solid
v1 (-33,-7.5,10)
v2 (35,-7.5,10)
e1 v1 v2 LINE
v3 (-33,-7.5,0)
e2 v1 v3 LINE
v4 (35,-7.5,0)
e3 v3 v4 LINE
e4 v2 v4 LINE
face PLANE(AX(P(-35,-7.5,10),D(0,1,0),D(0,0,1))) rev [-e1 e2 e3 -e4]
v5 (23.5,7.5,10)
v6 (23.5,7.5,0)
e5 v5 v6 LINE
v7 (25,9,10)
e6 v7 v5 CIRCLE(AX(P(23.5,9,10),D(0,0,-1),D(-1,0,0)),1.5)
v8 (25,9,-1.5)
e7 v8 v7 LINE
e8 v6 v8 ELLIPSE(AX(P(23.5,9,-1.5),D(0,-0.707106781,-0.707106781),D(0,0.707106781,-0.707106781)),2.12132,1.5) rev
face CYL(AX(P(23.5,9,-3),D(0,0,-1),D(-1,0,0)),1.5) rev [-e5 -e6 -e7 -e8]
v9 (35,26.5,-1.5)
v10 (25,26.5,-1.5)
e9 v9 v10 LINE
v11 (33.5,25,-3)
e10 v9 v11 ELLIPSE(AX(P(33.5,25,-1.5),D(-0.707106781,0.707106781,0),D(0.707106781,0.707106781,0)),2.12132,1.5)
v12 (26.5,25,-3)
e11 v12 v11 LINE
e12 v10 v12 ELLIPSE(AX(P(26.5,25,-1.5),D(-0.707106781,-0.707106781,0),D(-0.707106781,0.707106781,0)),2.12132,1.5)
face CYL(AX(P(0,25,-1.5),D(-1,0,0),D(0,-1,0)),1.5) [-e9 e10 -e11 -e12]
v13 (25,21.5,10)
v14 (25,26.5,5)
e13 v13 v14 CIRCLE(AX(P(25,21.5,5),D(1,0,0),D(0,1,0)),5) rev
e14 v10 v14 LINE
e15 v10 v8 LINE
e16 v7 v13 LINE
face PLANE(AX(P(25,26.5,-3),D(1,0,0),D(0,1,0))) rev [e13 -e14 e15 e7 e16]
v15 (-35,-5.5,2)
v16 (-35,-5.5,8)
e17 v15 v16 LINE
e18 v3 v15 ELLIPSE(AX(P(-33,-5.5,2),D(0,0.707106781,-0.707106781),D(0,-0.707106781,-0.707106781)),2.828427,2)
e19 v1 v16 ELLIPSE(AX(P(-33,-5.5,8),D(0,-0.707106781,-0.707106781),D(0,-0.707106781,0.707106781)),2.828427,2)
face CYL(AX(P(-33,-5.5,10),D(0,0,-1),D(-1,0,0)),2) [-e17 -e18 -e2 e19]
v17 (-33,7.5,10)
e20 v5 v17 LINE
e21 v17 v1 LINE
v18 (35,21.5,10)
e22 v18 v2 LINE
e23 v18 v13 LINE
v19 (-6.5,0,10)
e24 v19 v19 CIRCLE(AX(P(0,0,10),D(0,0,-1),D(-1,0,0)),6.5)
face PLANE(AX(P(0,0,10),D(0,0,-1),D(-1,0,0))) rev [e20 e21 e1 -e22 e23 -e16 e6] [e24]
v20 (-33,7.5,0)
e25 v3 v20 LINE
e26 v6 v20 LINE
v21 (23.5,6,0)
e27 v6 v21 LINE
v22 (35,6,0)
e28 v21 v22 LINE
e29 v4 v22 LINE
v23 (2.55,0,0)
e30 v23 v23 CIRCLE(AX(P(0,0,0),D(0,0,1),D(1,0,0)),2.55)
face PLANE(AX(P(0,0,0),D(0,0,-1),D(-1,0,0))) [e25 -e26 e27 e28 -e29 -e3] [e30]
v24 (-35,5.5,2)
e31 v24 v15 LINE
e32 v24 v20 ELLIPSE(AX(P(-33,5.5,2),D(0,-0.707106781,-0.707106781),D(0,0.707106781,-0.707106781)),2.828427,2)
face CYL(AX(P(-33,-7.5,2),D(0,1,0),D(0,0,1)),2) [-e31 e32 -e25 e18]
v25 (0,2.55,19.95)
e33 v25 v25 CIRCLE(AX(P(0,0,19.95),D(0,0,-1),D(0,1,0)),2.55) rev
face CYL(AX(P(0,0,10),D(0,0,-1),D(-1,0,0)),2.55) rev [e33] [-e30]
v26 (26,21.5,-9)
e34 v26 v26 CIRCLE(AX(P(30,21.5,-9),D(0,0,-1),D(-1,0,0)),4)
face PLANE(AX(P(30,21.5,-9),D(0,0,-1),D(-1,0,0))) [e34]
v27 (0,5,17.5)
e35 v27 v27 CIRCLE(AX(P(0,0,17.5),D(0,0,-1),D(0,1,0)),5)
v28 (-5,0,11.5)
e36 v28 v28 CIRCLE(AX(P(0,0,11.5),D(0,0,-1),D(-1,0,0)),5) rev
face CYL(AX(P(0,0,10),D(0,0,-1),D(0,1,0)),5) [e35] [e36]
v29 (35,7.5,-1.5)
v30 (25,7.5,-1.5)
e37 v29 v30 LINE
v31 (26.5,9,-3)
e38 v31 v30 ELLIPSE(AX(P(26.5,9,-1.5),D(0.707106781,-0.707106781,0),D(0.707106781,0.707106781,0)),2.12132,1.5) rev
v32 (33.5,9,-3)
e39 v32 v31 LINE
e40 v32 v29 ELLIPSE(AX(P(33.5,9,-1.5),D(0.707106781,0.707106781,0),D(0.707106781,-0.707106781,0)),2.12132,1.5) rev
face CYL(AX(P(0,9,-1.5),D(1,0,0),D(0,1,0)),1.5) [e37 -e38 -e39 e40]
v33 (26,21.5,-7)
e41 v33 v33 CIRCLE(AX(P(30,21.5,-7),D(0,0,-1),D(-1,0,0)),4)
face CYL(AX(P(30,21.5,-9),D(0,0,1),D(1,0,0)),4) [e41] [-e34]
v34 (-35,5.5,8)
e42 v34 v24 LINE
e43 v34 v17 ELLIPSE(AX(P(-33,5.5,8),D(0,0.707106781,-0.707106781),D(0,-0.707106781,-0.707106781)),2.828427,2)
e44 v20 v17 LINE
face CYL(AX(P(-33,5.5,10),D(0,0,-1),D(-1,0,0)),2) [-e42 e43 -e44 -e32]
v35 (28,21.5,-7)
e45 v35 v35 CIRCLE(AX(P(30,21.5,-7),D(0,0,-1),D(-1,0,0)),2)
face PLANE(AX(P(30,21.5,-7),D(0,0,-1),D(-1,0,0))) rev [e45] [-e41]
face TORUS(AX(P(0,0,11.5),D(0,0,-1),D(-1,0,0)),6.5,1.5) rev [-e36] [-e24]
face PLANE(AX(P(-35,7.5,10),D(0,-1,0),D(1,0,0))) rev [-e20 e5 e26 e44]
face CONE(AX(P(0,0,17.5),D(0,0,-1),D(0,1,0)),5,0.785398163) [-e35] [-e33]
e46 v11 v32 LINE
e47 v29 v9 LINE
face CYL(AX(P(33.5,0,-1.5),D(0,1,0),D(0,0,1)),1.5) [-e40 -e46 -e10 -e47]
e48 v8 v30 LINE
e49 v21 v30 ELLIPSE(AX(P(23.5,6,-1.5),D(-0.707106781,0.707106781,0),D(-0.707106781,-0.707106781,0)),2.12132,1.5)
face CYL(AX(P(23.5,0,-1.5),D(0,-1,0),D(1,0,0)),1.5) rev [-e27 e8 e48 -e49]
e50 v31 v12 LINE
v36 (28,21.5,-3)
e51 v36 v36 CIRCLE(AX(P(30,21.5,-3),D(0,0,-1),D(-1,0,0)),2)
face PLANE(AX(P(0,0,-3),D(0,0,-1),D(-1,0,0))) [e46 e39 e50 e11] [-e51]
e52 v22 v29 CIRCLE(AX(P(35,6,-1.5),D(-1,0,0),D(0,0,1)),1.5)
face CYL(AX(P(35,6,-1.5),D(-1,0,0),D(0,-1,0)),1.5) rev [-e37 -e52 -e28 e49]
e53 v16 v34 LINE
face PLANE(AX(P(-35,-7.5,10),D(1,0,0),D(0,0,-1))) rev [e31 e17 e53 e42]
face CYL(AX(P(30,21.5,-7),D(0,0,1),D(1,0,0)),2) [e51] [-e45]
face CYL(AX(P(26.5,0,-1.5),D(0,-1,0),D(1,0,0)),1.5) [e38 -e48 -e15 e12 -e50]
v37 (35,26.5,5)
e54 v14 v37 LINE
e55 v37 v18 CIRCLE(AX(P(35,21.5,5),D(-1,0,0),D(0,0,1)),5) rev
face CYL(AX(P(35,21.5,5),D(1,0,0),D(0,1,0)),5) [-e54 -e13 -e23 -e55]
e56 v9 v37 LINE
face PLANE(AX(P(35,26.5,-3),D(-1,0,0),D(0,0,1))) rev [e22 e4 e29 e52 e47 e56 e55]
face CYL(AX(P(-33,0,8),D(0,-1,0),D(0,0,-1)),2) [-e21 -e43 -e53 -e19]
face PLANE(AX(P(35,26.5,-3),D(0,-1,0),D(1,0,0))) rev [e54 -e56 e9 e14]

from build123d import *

# Parameters (mm, degrees)
SKETCH1_W                = 70
SKETCH1_H                = 15
SKETCH1_R                = 2.55
BOSS_EXTRUDE1_DEPTH      = 10
BOSS_EXTRUDE5_DEPTH      = 3
BOSS_EXTRUDE5_DEPTH_BACK = 10
SKETCH5_W                = 10
SKETCH5_H                = 19
FILLET1_R                = 2
SKETCH3_R                = 2
BOSS_EXTRUDE6_DEPTH      = 4
SKETCH6_R                = 4
BOSS_EXTRUDE7_DEPTH      = 2
FILLET4_R                = 5
FILLET3_R                = 1.5
FILLET9_R                = 1.5
SKETCH9_R                = 2.55
CUT_EXTRUDE1_DEPTH       = 10
FILLET10_R               = 1.5


# Some blends are built 0.0001 mm under size
with BuildPart() as part:
    # Sketch1 → Boss-Extrude1 (new body)
    with BuildSketch(Plane.XY):
        Rectangle(SKETCH1_W, SKETCH1_H)
        Circle(SKETCH1_R, mode=Mode.SUBTRACT)
    extrude(amount=BOSS_EXTRUDE1_DEPTH)

    # Fillet1
    fillet1_edges = [part.edges().sort_by_distance(p)[0] for p in [
        (-35, 0, 10),
        (-35, 0, 0),
        (-35, 7.5, 5),
        (-35, -7.5, 5),
    ]]
    fillet(fillet1_edges, radius=FILLET1_R)


with BuildPart() as body_2:
    # Sketch5 → Boss-Extrude5 (new, two sides: drawn at the far end of the back side and taken through both)
    with BuildSketch(Plane(origin=(0, 0, 0), x_dir=(-1, 0, 0), z_dir=(0, 0, -1)).offset(-BOSS_EXTRUDE5_DEPTH_BACK)):
        with Locations((-30, 17)):
            Rectangle(SKETCH5_W, SKETCH5_H)
    extrude(amount=BOSS_EXTRUDE5_DEPTH + BOSS_EXTRUDE5_DEPTH_BACK)

    # Fillet4
    fillet4_edges = [body_2.edges().sort_by_distance(p)[0] for p in [
        (30, 26.5, 10),
    ]]
    fillet(fillet4_edges, radius=FILLET4_R)


with BuildPart() as body_3:
    # Sketch3 → Boss-Extrude6 (new body)
    with BuildSketch(Plane(origin=(-35, 0, -3), x_dir=(-1, 0, 0), z_dir=(0, 0, -1))):
        with Locations((-65, 21.5)):
            Circle(SKETCH3_R)
    extrude(amount=BOSS_EXTRUDE6_DEPTH)


with BuildPart() as body_4:
    # Sketch6 → Boss-Extrude7 (new body)
    with BuildSketch(Plane(origin=(0, 0, -7), x_dir=(-1, 0, 0), z_dir=(0, 0, -1))):
        with Locations((-30, 21.5)):
            Circle(SKETCH6_R)
    extrude(amount=BOSS_EXTRUDE7_DEPTH)


with BuildPart() as body_3_1:
    add(body_3.part)

    # Combine1: union body 2, body 4, part
    add(body_2.part)
    add(body_4.part)
    add(part.part)

    # Fillet3
    # the kernel refuses this fillet: 1.5 mm, written as the material it adds along each edge
    with BuildSketch(Plane(origin=(35, 7.5, 0), x_dir=(0, 0, -1), z_dir=(-1, 0, 0))) as fillet3_piece_1:
        with BuildLine():
            CenterArc((FILLET3_R, FILLET3_R), FILLET3_R, 180, 90)
            Line((0, FILLET3_R), (0, 0))
            Line((0, 0), (FILLET3_R, 0))
        make_face()
    extrude(amount=10)
    # the kernel refuses this fillet: 1.5 mm, written as the material it takes off along each edge
    with BuildSketch(Plane(origin=(21.25, 7.5, -3), x_dir=(0, 1, 0), z_dir=(1, 0, 0))) as fillet3_2_piece_1:
        with BuildLine():
            CenterArc((FILLET3_R, FILLET3_R), FILLET3_R, 180, 90)
            Line((0, FILLET3_R), (0, 0))
            Line((0, 0), (FILLET3_R, 0))
        make_face()
    extrude(amount=17.5, mode=Mode.SUBTRACT)
    with BuildSketch(Plane(origin=(25, 30.25, -3), x_dir=(0, 0, 1), z_dir=(0, -1, 0))) as fillet3_2_piece_2:
        with BuildLine():
            CenterArc((FILLET3_R, -FILLET3_R), FILLET3_R, 90, 90)
            Line((0, -FILLET3_R), (0, 0))
            Line((0, 0), (FILLET3_R, 0))
        make_face()
    extrude(amount=26.5, mode=Mode.SUBTRACT)
    with BuildSketch(Plane(origin=(38.75, 26.5, -3), x_dir=(0, 0, 1), z_dir=(-1, 0, 0))) as fillet3_2_piece_3:
        with BuildLine():
            CenterArc((FILLET3_R, -FILLET3_R), FILLET3_R, 90, 90)
            Line((0, -FILLET3_R), (0, 0))
            Line((0, 0), (FILLET3_R, 0))
        make_face()
    extrude(amount=17.5, mode=Mode.SUBTRACT)
    with BuildSketch(Plane(origin=(35, 3.75, -3), x_dir=(-1, 0, 0), z_dir=(0, 1, 0))) as fillet3_2_piece_4:
        with BuildLine():
            CenterArc((FILLET3_R, FILLET3_R), FILLET3_R, 180, 90)
            Line((0, FILLET3_R), (0, 0))
            Line((0, 0), (FILLET3_R, 0))
        make_face()
    extrude(amount=26.5, mode=Mode.SUBTRACT)

    # Fillet9
    fillet9_edges = [body_3_1.edges().sort_by_distance(p)[0] for p in [
        (25, 6.75, 0),
        (25, 7.5, 5),
    ]]
    fillet(fillet9_edges, radius=FILLET9_R - 0.0001)  # a hair under: the kernel refuses the full size

    # Sketch8 → Revolve1 (revolve)
    with BuildSketch(Plane(origin=(0, 0, 0), x_dir=(0, 0, -1), z_dir=(1, 0, 0))):
        Polygon((-10, 0), (-20, 0), (-20, 2.5), (-17.5, 5), (-10, 5), align=None)
    revolve(axis=Axis((0, 0, 10), (0, 0, 1)))

    # Sketch9 → Cut-Extrude1 (cut)
    with BuildSketch(Plane(origin=(0, 0, 10), x_dir=(-1, 0, 0), z_dir=(0, 0, -1))):
        with Locations(Location((0, 0, 0), (0, 0, 90))):
            Circle(SKETCH9_R)
    extrude(amount=-CUT_EXTRUDE1_DEPTH, mode=Mode.SUBTRACT)

    # Fillet10
    fillet10_edges = [body_3_1.edges().sort_by_distance(p)[0] for p in [
        (0, -5, 10),
    ]]
    fillet(fillet10_edges, radius=FILLET10_R)


solid = body_3_1.part
